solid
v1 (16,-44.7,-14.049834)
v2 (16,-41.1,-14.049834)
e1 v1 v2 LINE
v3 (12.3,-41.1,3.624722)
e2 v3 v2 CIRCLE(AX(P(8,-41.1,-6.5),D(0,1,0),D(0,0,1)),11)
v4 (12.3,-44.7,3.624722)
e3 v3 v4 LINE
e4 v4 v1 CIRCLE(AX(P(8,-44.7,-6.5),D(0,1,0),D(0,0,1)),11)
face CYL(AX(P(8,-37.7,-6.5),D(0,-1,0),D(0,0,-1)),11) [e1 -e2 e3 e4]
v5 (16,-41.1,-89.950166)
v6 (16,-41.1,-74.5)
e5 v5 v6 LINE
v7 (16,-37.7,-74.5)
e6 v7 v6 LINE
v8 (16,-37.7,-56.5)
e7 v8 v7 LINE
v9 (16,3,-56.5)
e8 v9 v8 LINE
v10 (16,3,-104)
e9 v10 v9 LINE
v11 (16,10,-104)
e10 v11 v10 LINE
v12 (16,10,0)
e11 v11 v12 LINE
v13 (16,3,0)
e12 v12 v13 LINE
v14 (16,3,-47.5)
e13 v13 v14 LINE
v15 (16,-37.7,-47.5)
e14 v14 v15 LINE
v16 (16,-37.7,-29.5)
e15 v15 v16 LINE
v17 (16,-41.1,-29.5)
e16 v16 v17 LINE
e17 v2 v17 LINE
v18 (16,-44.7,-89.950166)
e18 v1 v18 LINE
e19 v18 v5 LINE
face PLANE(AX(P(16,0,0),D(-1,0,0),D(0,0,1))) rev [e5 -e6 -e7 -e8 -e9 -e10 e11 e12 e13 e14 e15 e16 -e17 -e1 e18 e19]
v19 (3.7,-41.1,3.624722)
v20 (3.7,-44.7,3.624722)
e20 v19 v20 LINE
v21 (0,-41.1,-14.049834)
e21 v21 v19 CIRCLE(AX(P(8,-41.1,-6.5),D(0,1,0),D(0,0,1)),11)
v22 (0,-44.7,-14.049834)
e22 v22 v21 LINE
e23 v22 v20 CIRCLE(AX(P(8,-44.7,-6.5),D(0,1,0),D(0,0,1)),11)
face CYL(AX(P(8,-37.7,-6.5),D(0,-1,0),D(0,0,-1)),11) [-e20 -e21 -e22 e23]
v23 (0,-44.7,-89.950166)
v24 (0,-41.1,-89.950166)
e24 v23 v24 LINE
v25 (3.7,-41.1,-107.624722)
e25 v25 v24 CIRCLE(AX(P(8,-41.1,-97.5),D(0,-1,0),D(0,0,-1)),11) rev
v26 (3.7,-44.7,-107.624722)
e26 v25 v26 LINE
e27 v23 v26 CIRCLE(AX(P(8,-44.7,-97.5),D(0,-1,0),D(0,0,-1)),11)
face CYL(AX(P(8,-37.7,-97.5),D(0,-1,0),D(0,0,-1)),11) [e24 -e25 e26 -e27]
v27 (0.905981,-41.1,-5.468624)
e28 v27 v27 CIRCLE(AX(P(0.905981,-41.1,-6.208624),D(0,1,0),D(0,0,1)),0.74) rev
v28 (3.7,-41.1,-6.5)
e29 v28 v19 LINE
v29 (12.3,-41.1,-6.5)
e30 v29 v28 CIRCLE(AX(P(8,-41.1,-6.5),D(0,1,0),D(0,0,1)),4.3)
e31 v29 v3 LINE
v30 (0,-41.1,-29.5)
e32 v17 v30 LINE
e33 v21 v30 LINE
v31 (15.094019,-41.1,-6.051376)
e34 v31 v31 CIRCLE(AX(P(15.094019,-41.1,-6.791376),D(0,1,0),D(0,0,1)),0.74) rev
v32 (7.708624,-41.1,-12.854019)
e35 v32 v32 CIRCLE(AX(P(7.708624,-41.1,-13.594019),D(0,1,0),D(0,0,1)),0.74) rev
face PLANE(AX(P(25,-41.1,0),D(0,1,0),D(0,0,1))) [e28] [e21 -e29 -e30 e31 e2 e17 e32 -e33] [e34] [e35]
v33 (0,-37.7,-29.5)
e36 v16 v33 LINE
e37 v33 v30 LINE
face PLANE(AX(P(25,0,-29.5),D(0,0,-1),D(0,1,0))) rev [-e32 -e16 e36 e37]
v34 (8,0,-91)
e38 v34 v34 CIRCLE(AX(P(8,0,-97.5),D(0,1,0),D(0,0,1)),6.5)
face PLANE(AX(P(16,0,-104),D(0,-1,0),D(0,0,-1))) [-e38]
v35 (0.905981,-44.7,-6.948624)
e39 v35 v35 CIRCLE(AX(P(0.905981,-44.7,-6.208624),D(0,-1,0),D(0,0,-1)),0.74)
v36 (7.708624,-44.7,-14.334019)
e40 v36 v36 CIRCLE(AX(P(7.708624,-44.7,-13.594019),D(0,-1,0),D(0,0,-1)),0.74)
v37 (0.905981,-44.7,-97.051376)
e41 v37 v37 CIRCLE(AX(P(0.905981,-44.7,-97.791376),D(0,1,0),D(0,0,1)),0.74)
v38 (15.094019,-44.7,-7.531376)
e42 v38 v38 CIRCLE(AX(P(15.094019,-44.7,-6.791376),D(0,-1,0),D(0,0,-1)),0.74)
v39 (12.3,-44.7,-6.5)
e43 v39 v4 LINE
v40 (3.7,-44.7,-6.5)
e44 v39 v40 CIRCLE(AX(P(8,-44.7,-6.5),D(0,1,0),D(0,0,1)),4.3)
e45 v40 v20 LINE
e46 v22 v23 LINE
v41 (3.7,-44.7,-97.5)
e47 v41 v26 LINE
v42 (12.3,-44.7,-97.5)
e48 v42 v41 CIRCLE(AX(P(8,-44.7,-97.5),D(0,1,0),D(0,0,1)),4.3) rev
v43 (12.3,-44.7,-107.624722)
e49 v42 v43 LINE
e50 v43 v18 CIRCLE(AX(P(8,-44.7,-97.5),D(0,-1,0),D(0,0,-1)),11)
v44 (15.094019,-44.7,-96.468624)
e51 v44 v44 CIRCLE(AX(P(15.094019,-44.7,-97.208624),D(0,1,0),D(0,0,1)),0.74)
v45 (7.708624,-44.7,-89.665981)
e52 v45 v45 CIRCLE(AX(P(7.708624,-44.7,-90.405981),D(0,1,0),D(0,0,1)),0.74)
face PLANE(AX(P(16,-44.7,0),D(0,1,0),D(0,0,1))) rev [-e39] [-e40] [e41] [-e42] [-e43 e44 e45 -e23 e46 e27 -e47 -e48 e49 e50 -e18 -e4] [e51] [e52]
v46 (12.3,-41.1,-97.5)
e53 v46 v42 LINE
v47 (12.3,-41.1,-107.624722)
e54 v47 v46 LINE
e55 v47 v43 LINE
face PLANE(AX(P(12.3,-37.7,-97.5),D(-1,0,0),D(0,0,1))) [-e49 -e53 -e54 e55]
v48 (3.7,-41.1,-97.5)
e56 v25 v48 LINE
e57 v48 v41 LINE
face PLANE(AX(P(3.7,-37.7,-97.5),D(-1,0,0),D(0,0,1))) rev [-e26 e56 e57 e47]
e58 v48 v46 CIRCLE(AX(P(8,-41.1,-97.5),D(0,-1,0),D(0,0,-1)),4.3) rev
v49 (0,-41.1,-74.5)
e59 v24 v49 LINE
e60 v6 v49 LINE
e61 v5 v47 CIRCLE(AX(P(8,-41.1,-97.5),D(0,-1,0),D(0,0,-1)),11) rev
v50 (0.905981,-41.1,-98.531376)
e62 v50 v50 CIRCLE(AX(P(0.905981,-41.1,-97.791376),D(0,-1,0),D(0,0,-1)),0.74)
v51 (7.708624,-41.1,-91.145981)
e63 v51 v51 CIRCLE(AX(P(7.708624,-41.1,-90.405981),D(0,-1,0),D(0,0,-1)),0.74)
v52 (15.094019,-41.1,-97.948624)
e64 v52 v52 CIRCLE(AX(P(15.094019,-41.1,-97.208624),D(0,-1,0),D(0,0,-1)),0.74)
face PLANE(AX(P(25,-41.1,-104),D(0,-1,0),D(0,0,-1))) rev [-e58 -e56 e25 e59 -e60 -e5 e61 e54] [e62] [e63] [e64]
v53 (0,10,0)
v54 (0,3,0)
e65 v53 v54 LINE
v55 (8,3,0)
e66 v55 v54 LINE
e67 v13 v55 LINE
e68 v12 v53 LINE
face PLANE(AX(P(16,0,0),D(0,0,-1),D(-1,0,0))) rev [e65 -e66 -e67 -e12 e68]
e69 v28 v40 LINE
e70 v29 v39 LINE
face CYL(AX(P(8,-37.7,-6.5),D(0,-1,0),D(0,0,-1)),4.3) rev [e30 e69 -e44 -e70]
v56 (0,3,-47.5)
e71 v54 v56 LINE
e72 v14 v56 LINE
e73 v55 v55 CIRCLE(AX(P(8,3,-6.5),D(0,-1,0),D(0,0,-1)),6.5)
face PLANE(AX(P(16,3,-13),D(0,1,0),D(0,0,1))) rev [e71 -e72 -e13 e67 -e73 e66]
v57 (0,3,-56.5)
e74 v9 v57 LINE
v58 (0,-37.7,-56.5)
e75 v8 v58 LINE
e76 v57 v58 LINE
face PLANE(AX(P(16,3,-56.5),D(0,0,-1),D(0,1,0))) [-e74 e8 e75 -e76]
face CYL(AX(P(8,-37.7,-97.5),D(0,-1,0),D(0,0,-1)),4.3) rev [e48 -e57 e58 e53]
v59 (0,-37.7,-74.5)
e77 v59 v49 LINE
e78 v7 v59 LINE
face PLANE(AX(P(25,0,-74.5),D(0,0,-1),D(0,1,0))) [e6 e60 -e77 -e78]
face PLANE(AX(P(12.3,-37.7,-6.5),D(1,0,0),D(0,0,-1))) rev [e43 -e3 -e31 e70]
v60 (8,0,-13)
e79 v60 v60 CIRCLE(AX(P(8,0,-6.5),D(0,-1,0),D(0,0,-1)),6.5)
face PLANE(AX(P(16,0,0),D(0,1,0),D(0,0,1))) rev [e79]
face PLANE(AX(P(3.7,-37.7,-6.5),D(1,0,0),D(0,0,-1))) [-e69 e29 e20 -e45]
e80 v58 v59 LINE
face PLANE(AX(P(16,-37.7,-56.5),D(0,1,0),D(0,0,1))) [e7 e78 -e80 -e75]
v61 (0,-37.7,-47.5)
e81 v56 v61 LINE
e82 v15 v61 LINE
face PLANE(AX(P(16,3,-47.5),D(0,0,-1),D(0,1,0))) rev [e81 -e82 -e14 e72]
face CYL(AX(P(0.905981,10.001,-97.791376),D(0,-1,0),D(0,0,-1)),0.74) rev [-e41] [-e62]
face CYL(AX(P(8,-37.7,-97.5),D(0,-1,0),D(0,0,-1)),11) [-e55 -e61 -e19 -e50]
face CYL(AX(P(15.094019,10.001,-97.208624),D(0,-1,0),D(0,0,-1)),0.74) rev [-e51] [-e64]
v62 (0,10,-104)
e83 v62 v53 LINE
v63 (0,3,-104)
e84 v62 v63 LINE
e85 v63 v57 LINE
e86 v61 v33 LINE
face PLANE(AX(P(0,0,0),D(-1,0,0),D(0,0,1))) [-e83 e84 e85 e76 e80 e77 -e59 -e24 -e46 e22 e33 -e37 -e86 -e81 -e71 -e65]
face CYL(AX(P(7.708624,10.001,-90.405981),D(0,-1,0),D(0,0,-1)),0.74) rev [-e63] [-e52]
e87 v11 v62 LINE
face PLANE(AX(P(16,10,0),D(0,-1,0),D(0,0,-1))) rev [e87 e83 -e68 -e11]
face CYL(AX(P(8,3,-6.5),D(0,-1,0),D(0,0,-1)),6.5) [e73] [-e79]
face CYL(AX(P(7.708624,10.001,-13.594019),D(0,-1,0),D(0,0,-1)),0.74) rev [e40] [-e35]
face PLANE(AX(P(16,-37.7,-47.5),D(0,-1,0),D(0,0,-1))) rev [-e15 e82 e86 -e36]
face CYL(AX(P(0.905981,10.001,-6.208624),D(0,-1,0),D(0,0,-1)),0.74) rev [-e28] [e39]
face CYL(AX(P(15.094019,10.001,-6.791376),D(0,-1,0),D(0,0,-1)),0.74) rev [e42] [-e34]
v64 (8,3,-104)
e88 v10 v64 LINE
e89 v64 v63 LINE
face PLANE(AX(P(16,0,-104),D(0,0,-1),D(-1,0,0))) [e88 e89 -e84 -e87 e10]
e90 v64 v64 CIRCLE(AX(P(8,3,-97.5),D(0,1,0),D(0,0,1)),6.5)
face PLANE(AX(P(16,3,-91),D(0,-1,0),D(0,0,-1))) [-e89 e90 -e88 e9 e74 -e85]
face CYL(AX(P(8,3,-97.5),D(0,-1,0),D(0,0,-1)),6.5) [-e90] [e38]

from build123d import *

# Parameters (mm, degrees)
EXTRUDE_1_DEPTH     = 16
CUT_EXTRUDE_1_DEPTH = 3
EXTRUDE_START       = -44.7
EXTRUDE_2_DEPTH     = 7
CUT_EXTRUDE_START   = -44.7
CUT_EXTRUDE_2_DEPTH = 7
SKETCH_4_W          = 33.124722218
SKETCH_4_H          = 3.4
CUT_EXTRUDE_3_DEPTH = 25
CUT_EXTRUDE_4_REACH = 79.827
SKETCH_6_R          = 0.74


# Read off the part's stored shape, not the designer's step: 凸台-拉伸2, 切除-拉伸2
with BuildPart() as part:
    # 草图1 → 凸台-拉伸1 (new body)
    with BuildSketch(Plane(origin=(0, 0, 0), x_dir=(0, 0, -1), z_dir=(1, 0, 0))):
        Polygon((0, 0), (13, 0), (13, 3), (47.5, 3), (47.5, -37.7), (0, -37.7), (0, -44.7), (52, -44.7), (52, 10), (0, 10), align=None)
    extrude_1 = extrude(amount=EXTRUDE_1_DEPTH)

    # 草图2 → 切除-拉伸1 (cut)
    with BuildSketch(Plane.XZ):
        with BuildLine():
            Line((8, 0), (0, 0))
            Line((0, 0), (0, -6.5))
            Line((0, -6.5), (0, -13))
            Line((0, -13), (8.000000017, -13))
            ThreePointArc((8.000000017, -13), (1.5, -6.500000009), (8, 0))
        make_face()
        with BuildLine():
            Line((16, 0), (8, 0))
            ThreePointArc((8, 0), (12.596194078, -1.903805922), (14.5, -6.5))
            ThreePointArc((14.5, -6.5), (12.596194084, -11.096194072), (8.000000017, -13))
            Line((8.000000017, -13), (16, -13))
            Line((16, -13), (16, 0))
        make_face()
    cut_extrude_1 = extrude(amount=-CUT_EXTRUDE_1_DEPTH, mode=Mode.SUBTRACT)

    # 凸台-拉伸2 outline → 凸台-拉伸2 (add)
    with BuildSketch(Plane(origin=(0, 0, 0), x_dir=(1, 0, 0), z_dir=(0, 1, 0)).offset(EXTRUDE_START)):
        with BuildLine():
            ThreePointArc((0, 14.049834435), (8, -4.5), (16, 14.049834435))
            Line((16, 14.049834435), (16, 0))
            Line((16, 0), (0, 0))
            Line((0, 0), (0, 14.049834435))
        make_face()
    extrude_2 = extrude(amount=EXTRUDE_2_DEPTH)

    # 切除-拉伸2 outline → 切除-拉伸2 (cut)
    with BuildSketch(Plane(origin=(0, 0, 0), x_dir=(1, 0, 0), z_dir=(0, 1, 0)).offset(CUT_EXTRUDE_START)):
        with BuildLine():
            ThreePointArc((12.3, 6.5), (8, 10.8), (3.7, 6.5))
            Line((3.7, 6.5), (3.7, -3.624722218))
            ThreePointArc((3.7, -3.624722218), (8, -4.5), (12.3, -3.624722218))
            Line((12.3, -3.624722218), (12.3, 6.5))
        make_face()
    cut_extrude_2 = extrude(amount=CUT_EXTRUDE_2_DEPTH, mode=Mode.SUBTRACT)

    # 草图4 → 切除-拉伸3 (cut, symmetric)
    with BuildSketch(Plane.ZY):
        with Locations((-12.937638891, -39.4)):
            Rectangle(SKETCH_4_W, SKETCH_4_H)
    cut_extrude_3 = extrude(amount=CUT_EXTRUDE_3_DEPTH, both=True, mode=Mode.SUBTRACT)

    # 草图6 → 切除-拉伸4 (cut, up to next)
    with BuildSketch(Plane.XZ.offset(44.7), mode=Mode.PRIVATE) as cut_extrude_4_sk1:
        with Locations(Location((0.90598139, -6.208624029, 0), (0, 0, 270))):
            Circle(SKETCH_6_R)
    cut_extrude_4_tool1 = extrude(cut_extrude_4_sk1.sketch, amount=-CUT_EXTRUDE_4_REACH, mode=Mode.PRIVATE) & part.part
    # 草图6 → 切除-拉伸4 (cut, up to next)
    with BuildSketch(Plane.XZ.offset(44.7), mode=Mode.PRIVATE) as cut_extrude_4_sk2:
        with Locations(Location((7.708624029, -13.59401861, 0), (0, 0, 270))):
            Circle(SKETCH_6_R)
    cut_extrude_4_tool2 = extrude(cut_extrude_4_sk2.sketch, amount=-CUT_EXTRUDE_4_REACH, mode=Mode.PRIVATE) & part.part
    # 草图6 → 切除-拉伸4 (cut, up to next)
    with BuildSketch(Plane.XZ.offset(44.7), mode=Mode.PRIVATE) as cut_extrude_4_sk3:
        with Locations(Location((15.09401861, -6.791375971, 0), (0, 0, 270))):
            Circle(SKETCH_6_R)
    cut_extrude_4_tool3 = extrude(cut_extrude_4_sk3.sketch, amount=-CUT_EXTRUDE_4_REACH, mode=Mode.PRIVATE) & part.part
    cut_extrude_4_1 = cut_extrude_4_tool1.solids().sort_by_distance((0.905981, -44.7, -6.208624))[0]
    add(cut_extrude_4_1, mode=Mode.SUBTRACT)
    cut_extrude_4_2 = cut_extrude_4_tool2.solids().sort_by_distance((7.708624, -44.7, -13.594019))[0]
    add(cut_extrude_4_2, mode=Mode.SUBTRACT)
    cut_extrude_4_3 = cut_extrude_4_tool3.solids().sort_by_distance((15.094019, -44.7, -6.791376))[0]
    add(cut_extrude_4_3, mode=Mode.SUBTRACT)
    cut_extrude_4 = cut_extrude_4_1 + cut_extrude_4_2 + cut_extrude_4_3  # 切除-拉伸4 as one shape, for the pattern or mirror that repeats it

    # 镜向1: 凸台-拉伸1, 切除-拉伸1, 凸台-拉伸2, 切除-拉伸2, 切除-拉伸3, 切除-拉伸4 across plane
    add(extrude_1.mirror(Plane(origin=(16, -44.7, -52), x_dir=(1, 0, 0), z_dir=(0, 0, 1))))
    add(cut_extrude_1.mirror(Plane(origin=(16, -44.7, -52), x_dir=(1, 0, 0), z_dir=(0, 0, 1))), mode=Mode.SUBTRACT)
    add(extrude_2.mirror(Plane(origin=(16, -44.7, -52), x_dir=(1, 0, 0), z_dir=(0, 0, 1))))
    add(cut_extrude_2.mirror(Plane(origin=(16, -44.7, -52), x_dir=(1, 0, 0), z_dir=(0, 0, 1))), mode=Mode.SUBTRACT)
    add(cut_extrude_3.mirror(Plane(origin=(16, -44.7, -52), x_dir=(1, 0, 0), z_dir=(0, 0, 1))), mode=Mode.SUBTRACT)
    add(cut_extrude_4.mirror(Plane(origin=(16, -44.7, -52), x_dir=(1, 0, 0), z_dir=(0, 0, 1))), mode=Mode.SUBTRACT)


solid = part.part
